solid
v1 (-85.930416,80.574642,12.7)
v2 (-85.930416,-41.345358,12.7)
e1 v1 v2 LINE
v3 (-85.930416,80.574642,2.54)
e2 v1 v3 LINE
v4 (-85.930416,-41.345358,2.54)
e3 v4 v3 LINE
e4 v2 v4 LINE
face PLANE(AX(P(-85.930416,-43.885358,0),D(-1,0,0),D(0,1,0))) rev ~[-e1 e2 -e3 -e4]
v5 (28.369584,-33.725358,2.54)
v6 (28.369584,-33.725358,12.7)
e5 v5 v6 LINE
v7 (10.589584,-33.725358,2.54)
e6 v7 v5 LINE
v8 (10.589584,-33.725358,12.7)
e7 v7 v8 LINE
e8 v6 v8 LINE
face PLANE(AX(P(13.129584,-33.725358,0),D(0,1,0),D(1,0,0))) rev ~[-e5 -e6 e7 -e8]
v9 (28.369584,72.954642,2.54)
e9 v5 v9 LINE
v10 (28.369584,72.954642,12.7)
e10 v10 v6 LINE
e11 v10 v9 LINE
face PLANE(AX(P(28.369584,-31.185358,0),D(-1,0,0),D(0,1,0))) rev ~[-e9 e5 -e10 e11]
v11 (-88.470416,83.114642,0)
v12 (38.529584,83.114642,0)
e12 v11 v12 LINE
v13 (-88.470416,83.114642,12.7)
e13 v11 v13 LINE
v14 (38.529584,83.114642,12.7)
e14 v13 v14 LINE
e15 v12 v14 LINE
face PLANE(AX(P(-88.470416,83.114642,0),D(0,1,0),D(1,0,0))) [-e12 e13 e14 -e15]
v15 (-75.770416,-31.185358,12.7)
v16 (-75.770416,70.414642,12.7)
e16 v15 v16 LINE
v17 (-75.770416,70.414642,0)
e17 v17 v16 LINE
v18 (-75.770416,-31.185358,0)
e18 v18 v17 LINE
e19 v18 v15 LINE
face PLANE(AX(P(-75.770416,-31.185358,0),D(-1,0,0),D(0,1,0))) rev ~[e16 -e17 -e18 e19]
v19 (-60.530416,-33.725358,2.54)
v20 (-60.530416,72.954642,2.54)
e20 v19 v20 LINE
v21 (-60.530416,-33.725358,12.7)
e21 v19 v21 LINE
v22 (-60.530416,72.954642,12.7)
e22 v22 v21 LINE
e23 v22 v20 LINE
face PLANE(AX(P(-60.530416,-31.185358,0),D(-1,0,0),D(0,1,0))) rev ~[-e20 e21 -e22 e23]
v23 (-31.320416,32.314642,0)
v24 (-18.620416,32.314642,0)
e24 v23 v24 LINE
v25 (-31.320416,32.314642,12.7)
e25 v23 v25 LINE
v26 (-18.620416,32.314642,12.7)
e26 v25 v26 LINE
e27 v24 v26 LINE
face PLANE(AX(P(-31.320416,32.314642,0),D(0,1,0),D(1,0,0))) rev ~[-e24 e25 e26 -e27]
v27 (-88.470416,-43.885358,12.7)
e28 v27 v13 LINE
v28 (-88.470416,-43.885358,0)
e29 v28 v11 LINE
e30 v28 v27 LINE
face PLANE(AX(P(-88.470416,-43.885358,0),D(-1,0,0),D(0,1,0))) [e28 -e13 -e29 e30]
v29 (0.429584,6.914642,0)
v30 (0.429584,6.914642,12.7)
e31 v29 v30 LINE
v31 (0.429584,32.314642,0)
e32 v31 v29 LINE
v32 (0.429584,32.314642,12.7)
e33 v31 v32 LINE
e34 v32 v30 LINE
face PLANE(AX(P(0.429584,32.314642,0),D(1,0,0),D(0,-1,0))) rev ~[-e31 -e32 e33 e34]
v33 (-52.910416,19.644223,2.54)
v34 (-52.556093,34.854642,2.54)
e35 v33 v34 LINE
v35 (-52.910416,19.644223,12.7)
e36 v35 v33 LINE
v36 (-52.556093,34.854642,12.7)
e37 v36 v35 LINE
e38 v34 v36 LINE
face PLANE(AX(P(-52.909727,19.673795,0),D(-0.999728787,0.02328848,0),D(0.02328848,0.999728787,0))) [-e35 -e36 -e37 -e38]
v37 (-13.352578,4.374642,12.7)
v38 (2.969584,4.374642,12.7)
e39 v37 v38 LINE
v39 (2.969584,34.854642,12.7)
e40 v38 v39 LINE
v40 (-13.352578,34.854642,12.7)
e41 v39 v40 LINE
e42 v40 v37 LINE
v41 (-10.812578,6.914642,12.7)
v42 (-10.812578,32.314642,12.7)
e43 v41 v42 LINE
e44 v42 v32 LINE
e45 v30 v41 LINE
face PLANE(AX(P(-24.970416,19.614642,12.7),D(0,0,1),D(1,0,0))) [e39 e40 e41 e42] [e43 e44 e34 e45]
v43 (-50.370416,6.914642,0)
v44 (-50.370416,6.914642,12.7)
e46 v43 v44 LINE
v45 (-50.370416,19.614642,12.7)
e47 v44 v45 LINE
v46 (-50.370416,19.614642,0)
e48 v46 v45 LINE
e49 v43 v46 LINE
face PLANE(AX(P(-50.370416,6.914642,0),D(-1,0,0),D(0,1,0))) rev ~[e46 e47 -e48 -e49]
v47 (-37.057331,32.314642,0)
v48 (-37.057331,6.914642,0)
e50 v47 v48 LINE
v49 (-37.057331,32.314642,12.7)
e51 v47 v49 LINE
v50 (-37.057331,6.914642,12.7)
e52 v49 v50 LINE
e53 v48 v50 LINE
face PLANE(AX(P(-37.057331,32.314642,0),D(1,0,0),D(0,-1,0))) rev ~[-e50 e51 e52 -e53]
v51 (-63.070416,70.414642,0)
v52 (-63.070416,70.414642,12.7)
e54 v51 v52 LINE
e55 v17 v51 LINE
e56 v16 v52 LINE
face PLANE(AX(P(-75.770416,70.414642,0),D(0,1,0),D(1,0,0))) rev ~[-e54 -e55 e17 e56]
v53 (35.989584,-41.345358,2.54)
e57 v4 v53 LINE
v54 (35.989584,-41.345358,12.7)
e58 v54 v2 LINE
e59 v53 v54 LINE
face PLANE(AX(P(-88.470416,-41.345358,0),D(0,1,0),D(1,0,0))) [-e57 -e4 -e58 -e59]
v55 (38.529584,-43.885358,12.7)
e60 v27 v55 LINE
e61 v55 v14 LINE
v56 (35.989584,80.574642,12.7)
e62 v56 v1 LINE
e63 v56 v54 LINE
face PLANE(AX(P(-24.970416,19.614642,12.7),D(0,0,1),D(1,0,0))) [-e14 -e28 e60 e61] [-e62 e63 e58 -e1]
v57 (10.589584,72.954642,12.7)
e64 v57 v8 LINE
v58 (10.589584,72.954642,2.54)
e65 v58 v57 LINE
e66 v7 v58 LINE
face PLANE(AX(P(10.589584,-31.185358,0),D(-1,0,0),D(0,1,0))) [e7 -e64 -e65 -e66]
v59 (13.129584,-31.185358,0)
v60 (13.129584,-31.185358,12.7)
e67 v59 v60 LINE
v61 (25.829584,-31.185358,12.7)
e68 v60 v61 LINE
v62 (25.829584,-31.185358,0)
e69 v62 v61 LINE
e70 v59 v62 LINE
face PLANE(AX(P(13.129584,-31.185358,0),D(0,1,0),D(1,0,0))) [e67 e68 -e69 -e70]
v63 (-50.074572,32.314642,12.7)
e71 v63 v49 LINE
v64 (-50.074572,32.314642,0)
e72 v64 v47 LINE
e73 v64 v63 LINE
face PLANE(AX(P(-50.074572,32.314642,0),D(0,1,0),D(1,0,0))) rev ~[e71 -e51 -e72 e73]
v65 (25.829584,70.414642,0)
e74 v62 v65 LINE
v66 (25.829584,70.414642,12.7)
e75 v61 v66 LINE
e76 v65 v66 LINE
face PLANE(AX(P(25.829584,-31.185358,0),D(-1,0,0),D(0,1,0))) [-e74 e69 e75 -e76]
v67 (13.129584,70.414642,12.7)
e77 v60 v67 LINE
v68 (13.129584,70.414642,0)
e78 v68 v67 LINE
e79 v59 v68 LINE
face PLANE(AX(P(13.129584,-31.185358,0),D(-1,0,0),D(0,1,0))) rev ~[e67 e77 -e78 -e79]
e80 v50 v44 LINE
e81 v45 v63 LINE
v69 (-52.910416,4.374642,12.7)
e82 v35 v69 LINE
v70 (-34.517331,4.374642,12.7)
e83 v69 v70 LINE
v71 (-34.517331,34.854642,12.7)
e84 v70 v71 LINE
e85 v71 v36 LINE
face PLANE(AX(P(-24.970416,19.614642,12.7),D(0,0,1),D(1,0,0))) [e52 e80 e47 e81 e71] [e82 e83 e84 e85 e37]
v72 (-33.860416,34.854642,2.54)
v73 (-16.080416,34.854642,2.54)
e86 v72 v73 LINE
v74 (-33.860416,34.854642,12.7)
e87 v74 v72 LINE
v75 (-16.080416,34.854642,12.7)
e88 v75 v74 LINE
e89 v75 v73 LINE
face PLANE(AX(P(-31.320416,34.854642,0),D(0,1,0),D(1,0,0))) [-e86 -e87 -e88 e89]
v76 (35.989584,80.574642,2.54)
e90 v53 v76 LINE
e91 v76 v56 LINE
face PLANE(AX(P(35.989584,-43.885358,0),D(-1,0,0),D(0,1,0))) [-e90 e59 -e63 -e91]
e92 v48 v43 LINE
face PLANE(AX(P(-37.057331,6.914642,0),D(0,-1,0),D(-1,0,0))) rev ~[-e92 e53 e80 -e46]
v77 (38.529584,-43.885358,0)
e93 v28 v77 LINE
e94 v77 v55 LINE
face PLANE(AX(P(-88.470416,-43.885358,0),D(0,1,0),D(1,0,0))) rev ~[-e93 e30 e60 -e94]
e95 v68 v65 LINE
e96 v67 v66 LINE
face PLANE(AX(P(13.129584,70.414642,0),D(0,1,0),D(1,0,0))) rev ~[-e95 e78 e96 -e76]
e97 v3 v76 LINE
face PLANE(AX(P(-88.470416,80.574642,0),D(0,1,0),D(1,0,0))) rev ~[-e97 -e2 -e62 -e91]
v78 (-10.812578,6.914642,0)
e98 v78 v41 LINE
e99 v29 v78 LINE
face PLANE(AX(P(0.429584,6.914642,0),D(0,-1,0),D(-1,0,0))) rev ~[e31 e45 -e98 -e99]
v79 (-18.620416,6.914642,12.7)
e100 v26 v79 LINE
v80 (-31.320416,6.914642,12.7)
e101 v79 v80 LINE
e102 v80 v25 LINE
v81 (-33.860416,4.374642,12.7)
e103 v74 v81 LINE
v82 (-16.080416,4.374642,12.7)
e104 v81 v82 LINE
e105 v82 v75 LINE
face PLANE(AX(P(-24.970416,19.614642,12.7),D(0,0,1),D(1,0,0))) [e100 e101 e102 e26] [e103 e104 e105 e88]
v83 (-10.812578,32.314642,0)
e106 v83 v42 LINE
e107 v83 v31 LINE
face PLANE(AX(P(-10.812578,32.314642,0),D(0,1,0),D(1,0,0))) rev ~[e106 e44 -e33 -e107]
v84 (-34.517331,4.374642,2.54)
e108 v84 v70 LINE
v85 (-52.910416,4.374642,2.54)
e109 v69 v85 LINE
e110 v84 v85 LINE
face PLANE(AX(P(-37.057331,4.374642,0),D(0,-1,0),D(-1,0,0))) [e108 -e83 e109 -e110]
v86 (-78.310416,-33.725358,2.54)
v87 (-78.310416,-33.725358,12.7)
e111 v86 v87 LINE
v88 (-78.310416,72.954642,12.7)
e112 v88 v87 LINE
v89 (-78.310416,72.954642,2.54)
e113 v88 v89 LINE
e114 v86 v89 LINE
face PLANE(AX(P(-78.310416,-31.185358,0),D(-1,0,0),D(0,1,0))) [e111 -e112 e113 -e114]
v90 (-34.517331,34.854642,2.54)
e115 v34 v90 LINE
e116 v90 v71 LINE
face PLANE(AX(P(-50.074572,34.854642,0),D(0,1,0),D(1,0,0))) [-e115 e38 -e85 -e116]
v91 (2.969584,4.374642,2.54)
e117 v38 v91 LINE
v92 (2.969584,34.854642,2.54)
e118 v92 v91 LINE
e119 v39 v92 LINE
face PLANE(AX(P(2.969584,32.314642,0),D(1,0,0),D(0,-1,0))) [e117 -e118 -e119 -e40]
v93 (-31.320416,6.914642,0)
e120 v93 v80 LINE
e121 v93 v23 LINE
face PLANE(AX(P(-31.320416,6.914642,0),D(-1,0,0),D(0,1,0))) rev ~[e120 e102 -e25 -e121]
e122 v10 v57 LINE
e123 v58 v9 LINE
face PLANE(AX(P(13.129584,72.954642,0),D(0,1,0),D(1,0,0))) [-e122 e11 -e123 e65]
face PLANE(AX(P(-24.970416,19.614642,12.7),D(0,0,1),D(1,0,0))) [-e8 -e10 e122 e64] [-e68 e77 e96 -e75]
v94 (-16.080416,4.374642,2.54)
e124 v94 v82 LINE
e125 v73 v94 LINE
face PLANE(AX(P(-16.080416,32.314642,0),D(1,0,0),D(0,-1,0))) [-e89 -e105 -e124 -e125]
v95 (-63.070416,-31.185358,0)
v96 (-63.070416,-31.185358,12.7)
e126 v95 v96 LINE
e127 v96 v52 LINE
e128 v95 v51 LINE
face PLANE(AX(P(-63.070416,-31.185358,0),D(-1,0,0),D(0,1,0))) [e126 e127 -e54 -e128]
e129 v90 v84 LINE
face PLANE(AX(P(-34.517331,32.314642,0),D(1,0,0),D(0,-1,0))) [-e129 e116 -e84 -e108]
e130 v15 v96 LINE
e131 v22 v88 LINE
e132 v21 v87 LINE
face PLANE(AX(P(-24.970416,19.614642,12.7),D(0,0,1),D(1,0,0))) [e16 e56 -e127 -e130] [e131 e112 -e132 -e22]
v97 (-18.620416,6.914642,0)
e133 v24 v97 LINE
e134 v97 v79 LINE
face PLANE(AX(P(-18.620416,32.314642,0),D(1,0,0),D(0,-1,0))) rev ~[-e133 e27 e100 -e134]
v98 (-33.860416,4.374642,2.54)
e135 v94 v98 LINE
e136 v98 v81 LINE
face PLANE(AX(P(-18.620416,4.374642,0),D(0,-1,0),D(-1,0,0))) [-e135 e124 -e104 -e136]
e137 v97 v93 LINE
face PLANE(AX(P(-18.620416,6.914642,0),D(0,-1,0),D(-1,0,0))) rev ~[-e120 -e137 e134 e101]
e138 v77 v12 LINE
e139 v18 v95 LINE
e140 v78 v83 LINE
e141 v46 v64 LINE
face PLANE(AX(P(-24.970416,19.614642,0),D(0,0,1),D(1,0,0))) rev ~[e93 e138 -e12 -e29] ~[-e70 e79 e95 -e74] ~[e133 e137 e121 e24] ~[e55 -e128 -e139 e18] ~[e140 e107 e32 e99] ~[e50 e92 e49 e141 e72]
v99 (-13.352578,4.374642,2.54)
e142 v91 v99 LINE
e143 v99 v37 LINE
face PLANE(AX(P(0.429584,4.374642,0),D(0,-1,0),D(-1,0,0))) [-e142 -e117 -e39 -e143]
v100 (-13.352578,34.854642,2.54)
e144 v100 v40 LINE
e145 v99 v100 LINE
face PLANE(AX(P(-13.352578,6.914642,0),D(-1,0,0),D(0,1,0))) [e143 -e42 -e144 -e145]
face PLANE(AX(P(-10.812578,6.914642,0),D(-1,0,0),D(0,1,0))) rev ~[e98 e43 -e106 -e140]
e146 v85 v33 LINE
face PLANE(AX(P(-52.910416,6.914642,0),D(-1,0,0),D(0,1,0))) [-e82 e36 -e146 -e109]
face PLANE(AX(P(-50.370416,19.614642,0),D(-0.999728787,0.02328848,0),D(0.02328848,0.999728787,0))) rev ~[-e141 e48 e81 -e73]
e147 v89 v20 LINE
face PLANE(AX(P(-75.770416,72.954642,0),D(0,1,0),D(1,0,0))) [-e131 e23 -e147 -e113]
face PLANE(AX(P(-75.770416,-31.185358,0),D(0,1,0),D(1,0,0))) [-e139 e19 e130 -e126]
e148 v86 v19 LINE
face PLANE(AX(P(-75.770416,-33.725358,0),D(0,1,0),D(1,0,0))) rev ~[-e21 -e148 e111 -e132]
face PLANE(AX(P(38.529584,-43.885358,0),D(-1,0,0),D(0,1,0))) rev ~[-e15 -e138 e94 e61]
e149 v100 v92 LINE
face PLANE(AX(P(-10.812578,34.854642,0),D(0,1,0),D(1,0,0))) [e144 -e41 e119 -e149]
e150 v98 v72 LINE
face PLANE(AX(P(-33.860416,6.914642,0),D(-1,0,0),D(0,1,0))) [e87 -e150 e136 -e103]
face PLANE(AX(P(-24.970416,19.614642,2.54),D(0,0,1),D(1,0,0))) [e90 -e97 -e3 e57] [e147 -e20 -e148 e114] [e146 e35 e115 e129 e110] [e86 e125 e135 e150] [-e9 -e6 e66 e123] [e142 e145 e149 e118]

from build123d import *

# Parameters (mm, degrees)
F0_W     = 127
F0_H     = 127
F0_W_2   = 12.7
F0_H_2   = 101.6
F1_DEPTH = 12.7
F2_T     = -2.54


with BuildPart() as f1:
    # F0 (on Top) → F1 (new body)
    with BuildSketch(Plane.XY):
        with Locations((-24.9704163089, 19.614642486)):
            Rectangle(F0_W, F0_H)
        with Locations((-69.4204163089, 19.614642486)):
            Rectangle(F0_W_2, F0_H_2, mode=Mode.SUBTRACT)
        Polygon((-50.3704163089, 6.914642486), (-50.3704163089, 19.614642486), (-50.0745723798, 32.314642486), (-37.0573314681, 32.314642486), (-37.0573314681, 6.914642486), align=None, mode=Mode.SUBTRACT)
        Polygon((-31.3204163089, 32.314642486), (-24.9704163089, 32.314642486), (-18.6204163089, 32.314642486), (-18.6204163089, 6.914642486), (-31.3204163089, 6.914642486), align=None, mode=Mode.SUBTRACT)
        Polygon((0.4295836911, 32.314642486), (0.4295836911, 19.614642486), (0.4295836911, 6.914642486), (-10.8125778138, 6.914642486), (-10.8125778138, 32.314642486), align=None, mode=Mode.SUBTRACT)
        with Locations((19.4795836911, 19.614642486)):
            Rectangle(F0_W_2, F0_H_2, mode=Mode.SUBTRACT)
    extrude(amount=F1_DEPTH)

    # F2
    f2_openings = [f1.faces().sort_by_distance(p)[0] for p in [
        (36.733532, 19.614642, 12.7),
    ]]
    offset(amount=F2_T, openings=f2_openings, kind=Kind.INTERSECTION)


solid = f1.part
